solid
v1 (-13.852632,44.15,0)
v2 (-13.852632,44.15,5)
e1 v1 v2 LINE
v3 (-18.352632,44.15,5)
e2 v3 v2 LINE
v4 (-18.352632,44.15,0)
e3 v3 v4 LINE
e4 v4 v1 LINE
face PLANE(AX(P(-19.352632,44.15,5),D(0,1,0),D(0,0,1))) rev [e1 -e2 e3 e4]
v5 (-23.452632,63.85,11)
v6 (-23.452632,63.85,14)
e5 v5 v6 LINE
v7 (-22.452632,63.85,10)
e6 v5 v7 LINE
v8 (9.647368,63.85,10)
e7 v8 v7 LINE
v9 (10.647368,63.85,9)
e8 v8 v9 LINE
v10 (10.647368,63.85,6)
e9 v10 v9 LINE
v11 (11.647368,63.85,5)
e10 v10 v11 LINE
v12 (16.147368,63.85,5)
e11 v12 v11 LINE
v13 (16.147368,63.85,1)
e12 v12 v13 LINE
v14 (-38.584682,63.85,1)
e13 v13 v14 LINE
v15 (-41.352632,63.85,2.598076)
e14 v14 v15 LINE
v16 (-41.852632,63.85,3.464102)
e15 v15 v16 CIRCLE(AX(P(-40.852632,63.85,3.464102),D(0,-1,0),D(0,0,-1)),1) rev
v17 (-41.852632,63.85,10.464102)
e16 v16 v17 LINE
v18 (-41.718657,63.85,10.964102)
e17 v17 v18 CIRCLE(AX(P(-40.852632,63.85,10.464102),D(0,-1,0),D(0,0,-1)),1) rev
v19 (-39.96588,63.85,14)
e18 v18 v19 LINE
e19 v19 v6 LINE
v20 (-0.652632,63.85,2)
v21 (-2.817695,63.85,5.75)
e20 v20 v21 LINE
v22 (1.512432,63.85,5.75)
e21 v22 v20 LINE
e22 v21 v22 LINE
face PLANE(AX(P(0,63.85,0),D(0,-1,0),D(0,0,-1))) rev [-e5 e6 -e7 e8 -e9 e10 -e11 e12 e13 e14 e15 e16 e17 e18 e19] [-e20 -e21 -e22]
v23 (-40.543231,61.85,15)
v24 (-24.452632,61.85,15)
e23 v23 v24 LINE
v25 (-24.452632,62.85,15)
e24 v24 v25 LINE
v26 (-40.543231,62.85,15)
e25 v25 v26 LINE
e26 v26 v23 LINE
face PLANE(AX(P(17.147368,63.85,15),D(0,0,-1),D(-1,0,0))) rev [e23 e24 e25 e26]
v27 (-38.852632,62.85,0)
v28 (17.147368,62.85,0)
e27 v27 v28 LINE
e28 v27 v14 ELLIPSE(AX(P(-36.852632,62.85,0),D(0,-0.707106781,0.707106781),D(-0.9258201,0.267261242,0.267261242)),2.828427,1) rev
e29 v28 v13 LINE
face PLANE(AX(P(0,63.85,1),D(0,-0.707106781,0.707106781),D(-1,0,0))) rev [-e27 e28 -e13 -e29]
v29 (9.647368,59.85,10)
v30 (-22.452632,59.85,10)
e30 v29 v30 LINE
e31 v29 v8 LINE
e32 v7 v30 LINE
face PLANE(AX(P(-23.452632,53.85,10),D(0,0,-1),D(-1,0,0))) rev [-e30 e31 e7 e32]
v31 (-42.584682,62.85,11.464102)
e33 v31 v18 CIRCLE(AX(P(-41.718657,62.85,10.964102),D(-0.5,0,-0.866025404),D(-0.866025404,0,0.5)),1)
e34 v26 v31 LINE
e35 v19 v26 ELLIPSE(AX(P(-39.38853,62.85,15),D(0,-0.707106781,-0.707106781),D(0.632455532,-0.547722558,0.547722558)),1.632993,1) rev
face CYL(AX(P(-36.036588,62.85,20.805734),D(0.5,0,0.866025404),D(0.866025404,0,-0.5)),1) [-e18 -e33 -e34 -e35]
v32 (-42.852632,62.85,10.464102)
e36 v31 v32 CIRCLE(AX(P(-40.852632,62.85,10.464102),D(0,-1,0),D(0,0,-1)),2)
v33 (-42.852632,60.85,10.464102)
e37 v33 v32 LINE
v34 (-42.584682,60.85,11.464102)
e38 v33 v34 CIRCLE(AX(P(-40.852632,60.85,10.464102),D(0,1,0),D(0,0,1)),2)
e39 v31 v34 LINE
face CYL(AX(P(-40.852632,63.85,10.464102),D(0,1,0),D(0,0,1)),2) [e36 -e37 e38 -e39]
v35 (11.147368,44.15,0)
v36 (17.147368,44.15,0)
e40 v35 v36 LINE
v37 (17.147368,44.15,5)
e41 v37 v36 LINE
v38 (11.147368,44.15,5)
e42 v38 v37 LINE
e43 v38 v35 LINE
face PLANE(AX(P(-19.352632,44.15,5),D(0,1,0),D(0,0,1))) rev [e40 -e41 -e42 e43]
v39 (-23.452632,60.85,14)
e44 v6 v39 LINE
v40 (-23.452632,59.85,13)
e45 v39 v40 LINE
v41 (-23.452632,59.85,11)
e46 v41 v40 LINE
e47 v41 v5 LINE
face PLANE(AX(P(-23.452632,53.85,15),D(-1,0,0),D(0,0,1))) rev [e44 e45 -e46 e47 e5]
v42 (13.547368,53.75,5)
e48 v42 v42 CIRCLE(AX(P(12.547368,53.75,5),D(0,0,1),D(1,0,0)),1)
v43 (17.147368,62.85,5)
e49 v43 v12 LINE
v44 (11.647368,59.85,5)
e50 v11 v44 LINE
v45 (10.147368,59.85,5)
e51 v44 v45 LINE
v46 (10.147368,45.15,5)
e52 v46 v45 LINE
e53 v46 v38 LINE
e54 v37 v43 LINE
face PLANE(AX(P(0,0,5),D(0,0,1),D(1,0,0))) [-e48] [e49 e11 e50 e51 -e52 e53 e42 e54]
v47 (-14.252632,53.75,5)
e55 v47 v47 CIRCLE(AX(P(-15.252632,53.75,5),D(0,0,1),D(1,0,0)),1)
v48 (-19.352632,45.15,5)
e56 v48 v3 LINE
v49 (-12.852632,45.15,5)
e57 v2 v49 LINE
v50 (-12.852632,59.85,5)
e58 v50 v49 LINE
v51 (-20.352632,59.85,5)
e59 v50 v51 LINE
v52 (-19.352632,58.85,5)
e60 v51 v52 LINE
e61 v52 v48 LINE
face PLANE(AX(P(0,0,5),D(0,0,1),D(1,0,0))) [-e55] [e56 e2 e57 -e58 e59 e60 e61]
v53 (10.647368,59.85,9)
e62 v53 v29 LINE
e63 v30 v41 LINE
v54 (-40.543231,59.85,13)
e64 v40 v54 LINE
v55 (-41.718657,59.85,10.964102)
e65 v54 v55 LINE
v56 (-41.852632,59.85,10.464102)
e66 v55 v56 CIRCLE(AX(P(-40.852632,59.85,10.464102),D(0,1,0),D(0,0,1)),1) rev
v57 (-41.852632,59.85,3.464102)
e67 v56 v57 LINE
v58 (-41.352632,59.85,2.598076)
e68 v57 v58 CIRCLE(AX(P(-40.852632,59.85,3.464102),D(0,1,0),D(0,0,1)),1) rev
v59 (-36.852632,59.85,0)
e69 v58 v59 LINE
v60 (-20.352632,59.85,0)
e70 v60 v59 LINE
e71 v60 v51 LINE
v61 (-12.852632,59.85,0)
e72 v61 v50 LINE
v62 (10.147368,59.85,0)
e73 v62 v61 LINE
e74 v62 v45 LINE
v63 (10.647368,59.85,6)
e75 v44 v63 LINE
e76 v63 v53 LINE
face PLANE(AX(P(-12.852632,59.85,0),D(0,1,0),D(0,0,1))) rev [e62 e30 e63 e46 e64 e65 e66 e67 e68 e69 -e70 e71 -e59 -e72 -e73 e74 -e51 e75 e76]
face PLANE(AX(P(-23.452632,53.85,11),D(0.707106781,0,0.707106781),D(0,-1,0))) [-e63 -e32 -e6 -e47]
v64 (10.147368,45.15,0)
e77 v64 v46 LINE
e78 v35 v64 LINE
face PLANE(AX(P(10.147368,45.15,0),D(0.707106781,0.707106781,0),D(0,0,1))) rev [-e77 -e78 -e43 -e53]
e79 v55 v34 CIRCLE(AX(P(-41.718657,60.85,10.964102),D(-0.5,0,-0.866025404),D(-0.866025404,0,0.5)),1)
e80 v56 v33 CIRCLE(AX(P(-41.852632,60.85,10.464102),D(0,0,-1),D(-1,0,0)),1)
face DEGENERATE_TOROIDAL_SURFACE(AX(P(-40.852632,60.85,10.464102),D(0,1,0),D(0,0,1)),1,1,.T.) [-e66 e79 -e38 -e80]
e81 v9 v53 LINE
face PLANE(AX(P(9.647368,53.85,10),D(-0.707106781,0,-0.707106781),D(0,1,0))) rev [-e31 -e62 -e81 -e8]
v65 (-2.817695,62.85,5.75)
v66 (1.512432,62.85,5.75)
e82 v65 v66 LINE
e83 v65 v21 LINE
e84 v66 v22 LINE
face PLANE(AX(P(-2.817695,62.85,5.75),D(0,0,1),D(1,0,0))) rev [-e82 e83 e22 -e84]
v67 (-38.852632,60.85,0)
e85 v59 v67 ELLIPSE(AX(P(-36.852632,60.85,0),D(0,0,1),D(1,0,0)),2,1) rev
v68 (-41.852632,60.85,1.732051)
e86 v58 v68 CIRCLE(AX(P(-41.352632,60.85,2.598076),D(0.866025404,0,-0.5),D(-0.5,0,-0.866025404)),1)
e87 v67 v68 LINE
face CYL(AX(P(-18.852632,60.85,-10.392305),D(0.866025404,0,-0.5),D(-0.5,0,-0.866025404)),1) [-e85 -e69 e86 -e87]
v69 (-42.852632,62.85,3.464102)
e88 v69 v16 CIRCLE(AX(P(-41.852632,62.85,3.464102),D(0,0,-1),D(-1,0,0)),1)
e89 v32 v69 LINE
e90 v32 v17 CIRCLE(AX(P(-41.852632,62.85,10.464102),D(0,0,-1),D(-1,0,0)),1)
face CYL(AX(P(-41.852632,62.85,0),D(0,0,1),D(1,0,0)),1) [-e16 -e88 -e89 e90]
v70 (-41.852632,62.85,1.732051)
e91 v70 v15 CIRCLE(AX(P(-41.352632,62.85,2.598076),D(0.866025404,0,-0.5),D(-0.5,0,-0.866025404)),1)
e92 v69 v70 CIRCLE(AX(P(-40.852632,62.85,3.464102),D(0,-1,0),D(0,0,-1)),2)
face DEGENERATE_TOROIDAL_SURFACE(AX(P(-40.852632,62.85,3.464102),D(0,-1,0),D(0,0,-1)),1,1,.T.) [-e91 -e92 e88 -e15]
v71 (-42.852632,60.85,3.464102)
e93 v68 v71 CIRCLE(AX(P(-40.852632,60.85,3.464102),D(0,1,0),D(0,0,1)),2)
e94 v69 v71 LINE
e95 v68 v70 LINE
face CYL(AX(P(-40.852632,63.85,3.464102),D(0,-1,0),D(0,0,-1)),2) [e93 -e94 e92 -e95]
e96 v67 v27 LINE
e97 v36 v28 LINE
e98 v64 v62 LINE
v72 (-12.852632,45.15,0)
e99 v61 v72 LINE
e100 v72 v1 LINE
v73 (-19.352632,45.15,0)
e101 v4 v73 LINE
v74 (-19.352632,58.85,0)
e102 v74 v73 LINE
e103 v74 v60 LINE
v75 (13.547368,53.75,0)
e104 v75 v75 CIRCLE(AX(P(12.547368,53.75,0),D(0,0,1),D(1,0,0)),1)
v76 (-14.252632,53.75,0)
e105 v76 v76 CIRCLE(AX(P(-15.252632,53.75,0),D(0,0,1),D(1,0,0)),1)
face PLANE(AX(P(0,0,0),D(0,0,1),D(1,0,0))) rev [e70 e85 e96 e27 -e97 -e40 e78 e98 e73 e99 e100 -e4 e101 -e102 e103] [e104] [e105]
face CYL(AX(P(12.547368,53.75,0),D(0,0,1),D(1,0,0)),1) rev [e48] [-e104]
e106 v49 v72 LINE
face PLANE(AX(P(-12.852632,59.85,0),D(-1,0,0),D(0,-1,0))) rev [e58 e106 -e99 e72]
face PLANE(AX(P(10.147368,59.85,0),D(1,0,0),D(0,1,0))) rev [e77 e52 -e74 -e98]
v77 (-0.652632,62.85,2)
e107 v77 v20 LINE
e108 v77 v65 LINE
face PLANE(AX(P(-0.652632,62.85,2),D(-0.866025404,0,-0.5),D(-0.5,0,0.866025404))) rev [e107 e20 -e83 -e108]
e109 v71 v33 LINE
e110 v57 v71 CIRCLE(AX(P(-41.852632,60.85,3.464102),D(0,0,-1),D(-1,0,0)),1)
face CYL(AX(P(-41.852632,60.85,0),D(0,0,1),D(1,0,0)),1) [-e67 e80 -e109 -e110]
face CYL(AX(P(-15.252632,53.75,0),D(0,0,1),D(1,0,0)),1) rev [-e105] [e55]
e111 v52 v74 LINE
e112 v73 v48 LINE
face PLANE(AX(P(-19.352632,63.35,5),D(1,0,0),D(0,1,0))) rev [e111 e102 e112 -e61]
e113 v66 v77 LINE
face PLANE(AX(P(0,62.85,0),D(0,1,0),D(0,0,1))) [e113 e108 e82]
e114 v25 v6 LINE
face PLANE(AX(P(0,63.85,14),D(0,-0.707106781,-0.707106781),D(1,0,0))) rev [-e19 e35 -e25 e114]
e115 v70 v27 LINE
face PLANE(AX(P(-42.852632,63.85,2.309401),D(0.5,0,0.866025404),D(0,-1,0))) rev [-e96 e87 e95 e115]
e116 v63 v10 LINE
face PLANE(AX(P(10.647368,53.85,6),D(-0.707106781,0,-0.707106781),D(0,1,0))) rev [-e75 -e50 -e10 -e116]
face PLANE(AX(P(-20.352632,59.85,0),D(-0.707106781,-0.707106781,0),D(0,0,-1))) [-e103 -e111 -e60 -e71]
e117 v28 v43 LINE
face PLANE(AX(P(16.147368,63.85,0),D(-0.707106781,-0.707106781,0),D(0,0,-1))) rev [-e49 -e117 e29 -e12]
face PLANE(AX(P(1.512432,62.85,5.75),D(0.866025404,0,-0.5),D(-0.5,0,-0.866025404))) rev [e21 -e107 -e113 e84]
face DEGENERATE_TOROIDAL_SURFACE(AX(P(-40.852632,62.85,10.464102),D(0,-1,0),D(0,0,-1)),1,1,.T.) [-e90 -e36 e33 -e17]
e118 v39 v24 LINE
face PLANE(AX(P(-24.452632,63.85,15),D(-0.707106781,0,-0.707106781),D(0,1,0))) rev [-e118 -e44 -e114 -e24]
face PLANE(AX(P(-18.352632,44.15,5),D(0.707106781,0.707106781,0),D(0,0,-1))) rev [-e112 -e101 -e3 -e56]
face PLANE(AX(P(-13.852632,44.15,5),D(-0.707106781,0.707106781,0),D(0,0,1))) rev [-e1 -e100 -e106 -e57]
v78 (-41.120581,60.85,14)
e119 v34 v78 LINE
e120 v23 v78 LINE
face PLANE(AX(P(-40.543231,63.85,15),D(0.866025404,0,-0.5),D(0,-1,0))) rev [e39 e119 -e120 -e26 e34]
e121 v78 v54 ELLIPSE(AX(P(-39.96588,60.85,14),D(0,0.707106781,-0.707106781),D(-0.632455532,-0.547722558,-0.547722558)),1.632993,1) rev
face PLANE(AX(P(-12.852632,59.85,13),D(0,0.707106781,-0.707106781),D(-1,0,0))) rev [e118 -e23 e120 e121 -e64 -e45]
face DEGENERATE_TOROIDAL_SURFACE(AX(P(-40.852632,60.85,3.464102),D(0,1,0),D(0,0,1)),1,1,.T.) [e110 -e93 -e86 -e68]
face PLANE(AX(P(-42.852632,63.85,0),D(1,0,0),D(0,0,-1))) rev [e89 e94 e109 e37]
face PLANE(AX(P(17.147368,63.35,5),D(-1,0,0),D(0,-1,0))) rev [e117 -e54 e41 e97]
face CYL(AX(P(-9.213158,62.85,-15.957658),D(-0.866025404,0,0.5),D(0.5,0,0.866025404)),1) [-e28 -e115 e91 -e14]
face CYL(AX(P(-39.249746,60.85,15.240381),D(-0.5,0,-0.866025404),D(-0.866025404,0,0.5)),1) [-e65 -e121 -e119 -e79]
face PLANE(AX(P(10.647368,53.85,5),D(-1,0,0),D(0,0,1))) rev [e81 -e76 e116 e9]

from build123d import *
from OCP.BRepFilletAPI import BRepFilletAPI_MakeChamfer

# Parameters (mm, degrees)
SKETCH1_W           = 36.5
SKETCH1_H           = 19.2
BOSS_EXTRUDE1_DEPTH = 5
SKETCH2_R           = 1
SKETCH2_W           = 23
SKETCH2_H           = 15.7
CUT_EXTRUDE3_DEPTH  = 67.428509309
SKETCH4_W           = 60
SKETCH4_H           = 15
BOSS_EXTRUDE2_DEPTH = 0.5
BOSS_EXTRUDE3_DEPTH = 3.5
CHAMFER1_SIZE       = 2
CHAMFER2_SIZE       = 1
CHAMFER3_SIZE       = 4
CHAMFER3_SIZE2      = 2.309401077
FILLET1_R           = 2
CUT_EXTRUDE4_DEPTH  = 1
FILLET2_R           = 1
CUT_EXTRUDE5_DEPTH  = 10
CHAMFER4_SIZE       = 1


with BuildPart() as part:
    # Sketch1 → Boss-Extrude1 (new body)
    with BuildSketch(Plane.XY):
        with Locations((-1.102631579, 53.75)):
            Rectangle(SKETCH1_W, SKETCH1_H)
    extrude(amount=BOSS_EXTRUDE1_DEPTH)

    # Sketch2 → Cut-Extrude3 (cut, through all)
    with BuildSketch(Plane.XY.offset(5)):
        with Locations((-15.252631579, 53.75)):
            Circle(SKETCH2_R)
        with Locations((12.547368421, 53.75)):
            Circle(SKETCH2_R)
        with Locations((-1.352631579, 52)):
            Rectangle(SKETCH2_W, SKETCH2_H)
    extrude(amount=-CUT_EXTRUDE3_DEPTH, mode=Mode.SUBTRACT)

    # Sketch4 → Boss-Extrude2 (add)
    with BuildSketch(Plane(origin=(0, 63.35, 0), x_dir=(1, 0, 0), z_dir=(0, 1, 0))):
        with Locations((-12.852631579, -7.5)):
            Rectangle(SKETCH4_W, SKETCH4_H)
    extrude(amount=BOSS_EXTRUDE2_DEPTH)

    # Sketch7 → Boss-Extrude3 (add)
    with BuildSketch(Plane.XZ.offset(-63.35)):
        Polygon((-19.352631579, 0), (-42.852631579, 0), (-42.852631579, 15), (-19.052631579, 15), (17.147368421, 15), (17.147368421, 5), (-19.352631579, 5), align=None)
    extrude(amount=BOSS_EXTRUDE3_DEPTH)

    # Chamfer1
    chamfer1_edges = [part.edges().sort_by_distance(p)[0] for p in [
        (-12.852631579, 59.85, 15),
    ]]
    chamfer(chamfer1_edges, length=CHAMFER1_SIZE)

    # Chamfer2
    chamfer2_edges = [part.edges().sort_by_distance(p)[0] for p in [
        (-12.852631579, 44.15, 2.5),
        (10.147368421, 44.15, 2.5),
        (17.147368421, 63.85, 7.5),
        (-12.852631579, 63.85, 0),
        (-12.852631579, 63.85, 15),
        (-19.352631579, 59.85, 2.5),
        (-19.352631579, 44.15, 2.5),
    ]]
    chamfer(chamfer2_edges, length=CHAMFER2_SIZE)

    # Chamfer3: one chamfer whose edges measure the first distance from different faces: ONE call of the kernel's chamfer builder (chamfer() names one face for all edges)
    chamfer3_edges_1 = [part.edges().sort_by_distance(p)[0] for p in [
        (-42.852631579, 61.35, 0),
    ]]
    chamfer3_side_1 = [part.faces().sort_by_distance(p)[0] for p in [
        (-18.724165987, 52, 0),
    ]]
    chamfer3_edges_2 = [part.edges().sort_by_distance(p)[0] for p in [
        (-42.852631579, 62.35, 15),
    ]]
    chamfer3_side_2 = [part.faces().sort_by_distance(p)[0] for p in [
        (-42.852631579, 61.86754386, 7.260233918),
    ]]
    chamfer3 = BRepFilletAPI_MakeChamfer(part.part.solid().wrapped)
    for e in chamfer3_edges_1:
        chamfer3.Add(CHAMFER3_SIZE, CHAMFER3_SIZE2, e.wrapped, chamfer3_side_1[0].wrapped)  # the first distance lies on this face
    for e in chamfer3_edges_2:
        chamfer3.Add(CHAMFER3_SIZE, CHAMFER3_SIZE2, e.wrapped, chamfer3_side_2[0].wrapped)  # the first distance lies on this face
    add(Compound.cast(chamfer3.Shape()), mode=Mode.REPLACE)

    # Fillet1
    fillet1_edges = [part.edges().sort_by_distance(p)[0] for p in [
        (-42.852631579, 61.85, 11),
        (-42.852631579, 61.85, 2.309401077),
    ]]
    fillet(fillet1_edges, radius=FILLET1_R)

    # Sketch8 → Cut-Extrude4 (cut)
    with BuildSketch(Plane(origin=(0, 63.85, 0), x_dir=(1, 0, 0), z_dir=(0, 1, 0))):
        Polygon((-0.652631579, -2), (-2.817695088, -5.75), (1.512431931, -5.75), align=None)
    extrude(amount=-CUT_EXTRUDE4_DEPTH, mode=Mode.SUBTRACT)

    # Fillet2
    fillet2_edges = [part.edges().sort_by_distance(p)[0] for p in [
        (-41.218656983, 63.85, 1.366025404),
        (-42.584682387, 63.85, 2.464101615),
        (-41.852631579, 63.85, 12.732050808),
        (-42.784483232, 63.85, 10.981739705),
        (-40.352631579, 59.85, 0.866025404),
        (-42.584682387, 59.85, 2.464101615),
        (-42.141306714, 59.85, 12.232050808),
        (-42.784483232, 59.85, 10.981739705),
        (-42.852631579, 63.85, 6.964101615),
        (-42.852631579, 59.85, 6.964101615),
    ]]
    fillet(fillet2_edges, radius=FILLET2_R - 0.0001)  # a hair under: the kernel refuses the full size

    # Sketch9 → Cut-Extrude5 (cut)
    with BuildSketch(Plane(origin=(0, 63.85, 0), x_dir=(1, 0, 0), z_dir=(0, 1, 0))):
        Polygon((17.147368421, -5), (10.647368421, -5), (10.647368421, -10), (-23.452631579, -10), (-23.452631579, -15), (9.647368421, -15), (17.147368421, -15), align=None)
    extrude(amount=-CUT_EXTRUDE5_DEPTH, mode=Mode.SUBTRACT)

    # Chamfer4
    chamfer4_edges = [part.edges().sort_by_distance(p)[0] for p in [
        (10.647368421, 61.85, 5),
        (-23.452631579, 61.85, 10),
        (10.647368421, 61.85, 10),
        (-23.452631579, 62.35, 15),
    ]]
    chamfer(chamfer4_edges, length=CHAMFER4_SIZE)


solid = part.part
